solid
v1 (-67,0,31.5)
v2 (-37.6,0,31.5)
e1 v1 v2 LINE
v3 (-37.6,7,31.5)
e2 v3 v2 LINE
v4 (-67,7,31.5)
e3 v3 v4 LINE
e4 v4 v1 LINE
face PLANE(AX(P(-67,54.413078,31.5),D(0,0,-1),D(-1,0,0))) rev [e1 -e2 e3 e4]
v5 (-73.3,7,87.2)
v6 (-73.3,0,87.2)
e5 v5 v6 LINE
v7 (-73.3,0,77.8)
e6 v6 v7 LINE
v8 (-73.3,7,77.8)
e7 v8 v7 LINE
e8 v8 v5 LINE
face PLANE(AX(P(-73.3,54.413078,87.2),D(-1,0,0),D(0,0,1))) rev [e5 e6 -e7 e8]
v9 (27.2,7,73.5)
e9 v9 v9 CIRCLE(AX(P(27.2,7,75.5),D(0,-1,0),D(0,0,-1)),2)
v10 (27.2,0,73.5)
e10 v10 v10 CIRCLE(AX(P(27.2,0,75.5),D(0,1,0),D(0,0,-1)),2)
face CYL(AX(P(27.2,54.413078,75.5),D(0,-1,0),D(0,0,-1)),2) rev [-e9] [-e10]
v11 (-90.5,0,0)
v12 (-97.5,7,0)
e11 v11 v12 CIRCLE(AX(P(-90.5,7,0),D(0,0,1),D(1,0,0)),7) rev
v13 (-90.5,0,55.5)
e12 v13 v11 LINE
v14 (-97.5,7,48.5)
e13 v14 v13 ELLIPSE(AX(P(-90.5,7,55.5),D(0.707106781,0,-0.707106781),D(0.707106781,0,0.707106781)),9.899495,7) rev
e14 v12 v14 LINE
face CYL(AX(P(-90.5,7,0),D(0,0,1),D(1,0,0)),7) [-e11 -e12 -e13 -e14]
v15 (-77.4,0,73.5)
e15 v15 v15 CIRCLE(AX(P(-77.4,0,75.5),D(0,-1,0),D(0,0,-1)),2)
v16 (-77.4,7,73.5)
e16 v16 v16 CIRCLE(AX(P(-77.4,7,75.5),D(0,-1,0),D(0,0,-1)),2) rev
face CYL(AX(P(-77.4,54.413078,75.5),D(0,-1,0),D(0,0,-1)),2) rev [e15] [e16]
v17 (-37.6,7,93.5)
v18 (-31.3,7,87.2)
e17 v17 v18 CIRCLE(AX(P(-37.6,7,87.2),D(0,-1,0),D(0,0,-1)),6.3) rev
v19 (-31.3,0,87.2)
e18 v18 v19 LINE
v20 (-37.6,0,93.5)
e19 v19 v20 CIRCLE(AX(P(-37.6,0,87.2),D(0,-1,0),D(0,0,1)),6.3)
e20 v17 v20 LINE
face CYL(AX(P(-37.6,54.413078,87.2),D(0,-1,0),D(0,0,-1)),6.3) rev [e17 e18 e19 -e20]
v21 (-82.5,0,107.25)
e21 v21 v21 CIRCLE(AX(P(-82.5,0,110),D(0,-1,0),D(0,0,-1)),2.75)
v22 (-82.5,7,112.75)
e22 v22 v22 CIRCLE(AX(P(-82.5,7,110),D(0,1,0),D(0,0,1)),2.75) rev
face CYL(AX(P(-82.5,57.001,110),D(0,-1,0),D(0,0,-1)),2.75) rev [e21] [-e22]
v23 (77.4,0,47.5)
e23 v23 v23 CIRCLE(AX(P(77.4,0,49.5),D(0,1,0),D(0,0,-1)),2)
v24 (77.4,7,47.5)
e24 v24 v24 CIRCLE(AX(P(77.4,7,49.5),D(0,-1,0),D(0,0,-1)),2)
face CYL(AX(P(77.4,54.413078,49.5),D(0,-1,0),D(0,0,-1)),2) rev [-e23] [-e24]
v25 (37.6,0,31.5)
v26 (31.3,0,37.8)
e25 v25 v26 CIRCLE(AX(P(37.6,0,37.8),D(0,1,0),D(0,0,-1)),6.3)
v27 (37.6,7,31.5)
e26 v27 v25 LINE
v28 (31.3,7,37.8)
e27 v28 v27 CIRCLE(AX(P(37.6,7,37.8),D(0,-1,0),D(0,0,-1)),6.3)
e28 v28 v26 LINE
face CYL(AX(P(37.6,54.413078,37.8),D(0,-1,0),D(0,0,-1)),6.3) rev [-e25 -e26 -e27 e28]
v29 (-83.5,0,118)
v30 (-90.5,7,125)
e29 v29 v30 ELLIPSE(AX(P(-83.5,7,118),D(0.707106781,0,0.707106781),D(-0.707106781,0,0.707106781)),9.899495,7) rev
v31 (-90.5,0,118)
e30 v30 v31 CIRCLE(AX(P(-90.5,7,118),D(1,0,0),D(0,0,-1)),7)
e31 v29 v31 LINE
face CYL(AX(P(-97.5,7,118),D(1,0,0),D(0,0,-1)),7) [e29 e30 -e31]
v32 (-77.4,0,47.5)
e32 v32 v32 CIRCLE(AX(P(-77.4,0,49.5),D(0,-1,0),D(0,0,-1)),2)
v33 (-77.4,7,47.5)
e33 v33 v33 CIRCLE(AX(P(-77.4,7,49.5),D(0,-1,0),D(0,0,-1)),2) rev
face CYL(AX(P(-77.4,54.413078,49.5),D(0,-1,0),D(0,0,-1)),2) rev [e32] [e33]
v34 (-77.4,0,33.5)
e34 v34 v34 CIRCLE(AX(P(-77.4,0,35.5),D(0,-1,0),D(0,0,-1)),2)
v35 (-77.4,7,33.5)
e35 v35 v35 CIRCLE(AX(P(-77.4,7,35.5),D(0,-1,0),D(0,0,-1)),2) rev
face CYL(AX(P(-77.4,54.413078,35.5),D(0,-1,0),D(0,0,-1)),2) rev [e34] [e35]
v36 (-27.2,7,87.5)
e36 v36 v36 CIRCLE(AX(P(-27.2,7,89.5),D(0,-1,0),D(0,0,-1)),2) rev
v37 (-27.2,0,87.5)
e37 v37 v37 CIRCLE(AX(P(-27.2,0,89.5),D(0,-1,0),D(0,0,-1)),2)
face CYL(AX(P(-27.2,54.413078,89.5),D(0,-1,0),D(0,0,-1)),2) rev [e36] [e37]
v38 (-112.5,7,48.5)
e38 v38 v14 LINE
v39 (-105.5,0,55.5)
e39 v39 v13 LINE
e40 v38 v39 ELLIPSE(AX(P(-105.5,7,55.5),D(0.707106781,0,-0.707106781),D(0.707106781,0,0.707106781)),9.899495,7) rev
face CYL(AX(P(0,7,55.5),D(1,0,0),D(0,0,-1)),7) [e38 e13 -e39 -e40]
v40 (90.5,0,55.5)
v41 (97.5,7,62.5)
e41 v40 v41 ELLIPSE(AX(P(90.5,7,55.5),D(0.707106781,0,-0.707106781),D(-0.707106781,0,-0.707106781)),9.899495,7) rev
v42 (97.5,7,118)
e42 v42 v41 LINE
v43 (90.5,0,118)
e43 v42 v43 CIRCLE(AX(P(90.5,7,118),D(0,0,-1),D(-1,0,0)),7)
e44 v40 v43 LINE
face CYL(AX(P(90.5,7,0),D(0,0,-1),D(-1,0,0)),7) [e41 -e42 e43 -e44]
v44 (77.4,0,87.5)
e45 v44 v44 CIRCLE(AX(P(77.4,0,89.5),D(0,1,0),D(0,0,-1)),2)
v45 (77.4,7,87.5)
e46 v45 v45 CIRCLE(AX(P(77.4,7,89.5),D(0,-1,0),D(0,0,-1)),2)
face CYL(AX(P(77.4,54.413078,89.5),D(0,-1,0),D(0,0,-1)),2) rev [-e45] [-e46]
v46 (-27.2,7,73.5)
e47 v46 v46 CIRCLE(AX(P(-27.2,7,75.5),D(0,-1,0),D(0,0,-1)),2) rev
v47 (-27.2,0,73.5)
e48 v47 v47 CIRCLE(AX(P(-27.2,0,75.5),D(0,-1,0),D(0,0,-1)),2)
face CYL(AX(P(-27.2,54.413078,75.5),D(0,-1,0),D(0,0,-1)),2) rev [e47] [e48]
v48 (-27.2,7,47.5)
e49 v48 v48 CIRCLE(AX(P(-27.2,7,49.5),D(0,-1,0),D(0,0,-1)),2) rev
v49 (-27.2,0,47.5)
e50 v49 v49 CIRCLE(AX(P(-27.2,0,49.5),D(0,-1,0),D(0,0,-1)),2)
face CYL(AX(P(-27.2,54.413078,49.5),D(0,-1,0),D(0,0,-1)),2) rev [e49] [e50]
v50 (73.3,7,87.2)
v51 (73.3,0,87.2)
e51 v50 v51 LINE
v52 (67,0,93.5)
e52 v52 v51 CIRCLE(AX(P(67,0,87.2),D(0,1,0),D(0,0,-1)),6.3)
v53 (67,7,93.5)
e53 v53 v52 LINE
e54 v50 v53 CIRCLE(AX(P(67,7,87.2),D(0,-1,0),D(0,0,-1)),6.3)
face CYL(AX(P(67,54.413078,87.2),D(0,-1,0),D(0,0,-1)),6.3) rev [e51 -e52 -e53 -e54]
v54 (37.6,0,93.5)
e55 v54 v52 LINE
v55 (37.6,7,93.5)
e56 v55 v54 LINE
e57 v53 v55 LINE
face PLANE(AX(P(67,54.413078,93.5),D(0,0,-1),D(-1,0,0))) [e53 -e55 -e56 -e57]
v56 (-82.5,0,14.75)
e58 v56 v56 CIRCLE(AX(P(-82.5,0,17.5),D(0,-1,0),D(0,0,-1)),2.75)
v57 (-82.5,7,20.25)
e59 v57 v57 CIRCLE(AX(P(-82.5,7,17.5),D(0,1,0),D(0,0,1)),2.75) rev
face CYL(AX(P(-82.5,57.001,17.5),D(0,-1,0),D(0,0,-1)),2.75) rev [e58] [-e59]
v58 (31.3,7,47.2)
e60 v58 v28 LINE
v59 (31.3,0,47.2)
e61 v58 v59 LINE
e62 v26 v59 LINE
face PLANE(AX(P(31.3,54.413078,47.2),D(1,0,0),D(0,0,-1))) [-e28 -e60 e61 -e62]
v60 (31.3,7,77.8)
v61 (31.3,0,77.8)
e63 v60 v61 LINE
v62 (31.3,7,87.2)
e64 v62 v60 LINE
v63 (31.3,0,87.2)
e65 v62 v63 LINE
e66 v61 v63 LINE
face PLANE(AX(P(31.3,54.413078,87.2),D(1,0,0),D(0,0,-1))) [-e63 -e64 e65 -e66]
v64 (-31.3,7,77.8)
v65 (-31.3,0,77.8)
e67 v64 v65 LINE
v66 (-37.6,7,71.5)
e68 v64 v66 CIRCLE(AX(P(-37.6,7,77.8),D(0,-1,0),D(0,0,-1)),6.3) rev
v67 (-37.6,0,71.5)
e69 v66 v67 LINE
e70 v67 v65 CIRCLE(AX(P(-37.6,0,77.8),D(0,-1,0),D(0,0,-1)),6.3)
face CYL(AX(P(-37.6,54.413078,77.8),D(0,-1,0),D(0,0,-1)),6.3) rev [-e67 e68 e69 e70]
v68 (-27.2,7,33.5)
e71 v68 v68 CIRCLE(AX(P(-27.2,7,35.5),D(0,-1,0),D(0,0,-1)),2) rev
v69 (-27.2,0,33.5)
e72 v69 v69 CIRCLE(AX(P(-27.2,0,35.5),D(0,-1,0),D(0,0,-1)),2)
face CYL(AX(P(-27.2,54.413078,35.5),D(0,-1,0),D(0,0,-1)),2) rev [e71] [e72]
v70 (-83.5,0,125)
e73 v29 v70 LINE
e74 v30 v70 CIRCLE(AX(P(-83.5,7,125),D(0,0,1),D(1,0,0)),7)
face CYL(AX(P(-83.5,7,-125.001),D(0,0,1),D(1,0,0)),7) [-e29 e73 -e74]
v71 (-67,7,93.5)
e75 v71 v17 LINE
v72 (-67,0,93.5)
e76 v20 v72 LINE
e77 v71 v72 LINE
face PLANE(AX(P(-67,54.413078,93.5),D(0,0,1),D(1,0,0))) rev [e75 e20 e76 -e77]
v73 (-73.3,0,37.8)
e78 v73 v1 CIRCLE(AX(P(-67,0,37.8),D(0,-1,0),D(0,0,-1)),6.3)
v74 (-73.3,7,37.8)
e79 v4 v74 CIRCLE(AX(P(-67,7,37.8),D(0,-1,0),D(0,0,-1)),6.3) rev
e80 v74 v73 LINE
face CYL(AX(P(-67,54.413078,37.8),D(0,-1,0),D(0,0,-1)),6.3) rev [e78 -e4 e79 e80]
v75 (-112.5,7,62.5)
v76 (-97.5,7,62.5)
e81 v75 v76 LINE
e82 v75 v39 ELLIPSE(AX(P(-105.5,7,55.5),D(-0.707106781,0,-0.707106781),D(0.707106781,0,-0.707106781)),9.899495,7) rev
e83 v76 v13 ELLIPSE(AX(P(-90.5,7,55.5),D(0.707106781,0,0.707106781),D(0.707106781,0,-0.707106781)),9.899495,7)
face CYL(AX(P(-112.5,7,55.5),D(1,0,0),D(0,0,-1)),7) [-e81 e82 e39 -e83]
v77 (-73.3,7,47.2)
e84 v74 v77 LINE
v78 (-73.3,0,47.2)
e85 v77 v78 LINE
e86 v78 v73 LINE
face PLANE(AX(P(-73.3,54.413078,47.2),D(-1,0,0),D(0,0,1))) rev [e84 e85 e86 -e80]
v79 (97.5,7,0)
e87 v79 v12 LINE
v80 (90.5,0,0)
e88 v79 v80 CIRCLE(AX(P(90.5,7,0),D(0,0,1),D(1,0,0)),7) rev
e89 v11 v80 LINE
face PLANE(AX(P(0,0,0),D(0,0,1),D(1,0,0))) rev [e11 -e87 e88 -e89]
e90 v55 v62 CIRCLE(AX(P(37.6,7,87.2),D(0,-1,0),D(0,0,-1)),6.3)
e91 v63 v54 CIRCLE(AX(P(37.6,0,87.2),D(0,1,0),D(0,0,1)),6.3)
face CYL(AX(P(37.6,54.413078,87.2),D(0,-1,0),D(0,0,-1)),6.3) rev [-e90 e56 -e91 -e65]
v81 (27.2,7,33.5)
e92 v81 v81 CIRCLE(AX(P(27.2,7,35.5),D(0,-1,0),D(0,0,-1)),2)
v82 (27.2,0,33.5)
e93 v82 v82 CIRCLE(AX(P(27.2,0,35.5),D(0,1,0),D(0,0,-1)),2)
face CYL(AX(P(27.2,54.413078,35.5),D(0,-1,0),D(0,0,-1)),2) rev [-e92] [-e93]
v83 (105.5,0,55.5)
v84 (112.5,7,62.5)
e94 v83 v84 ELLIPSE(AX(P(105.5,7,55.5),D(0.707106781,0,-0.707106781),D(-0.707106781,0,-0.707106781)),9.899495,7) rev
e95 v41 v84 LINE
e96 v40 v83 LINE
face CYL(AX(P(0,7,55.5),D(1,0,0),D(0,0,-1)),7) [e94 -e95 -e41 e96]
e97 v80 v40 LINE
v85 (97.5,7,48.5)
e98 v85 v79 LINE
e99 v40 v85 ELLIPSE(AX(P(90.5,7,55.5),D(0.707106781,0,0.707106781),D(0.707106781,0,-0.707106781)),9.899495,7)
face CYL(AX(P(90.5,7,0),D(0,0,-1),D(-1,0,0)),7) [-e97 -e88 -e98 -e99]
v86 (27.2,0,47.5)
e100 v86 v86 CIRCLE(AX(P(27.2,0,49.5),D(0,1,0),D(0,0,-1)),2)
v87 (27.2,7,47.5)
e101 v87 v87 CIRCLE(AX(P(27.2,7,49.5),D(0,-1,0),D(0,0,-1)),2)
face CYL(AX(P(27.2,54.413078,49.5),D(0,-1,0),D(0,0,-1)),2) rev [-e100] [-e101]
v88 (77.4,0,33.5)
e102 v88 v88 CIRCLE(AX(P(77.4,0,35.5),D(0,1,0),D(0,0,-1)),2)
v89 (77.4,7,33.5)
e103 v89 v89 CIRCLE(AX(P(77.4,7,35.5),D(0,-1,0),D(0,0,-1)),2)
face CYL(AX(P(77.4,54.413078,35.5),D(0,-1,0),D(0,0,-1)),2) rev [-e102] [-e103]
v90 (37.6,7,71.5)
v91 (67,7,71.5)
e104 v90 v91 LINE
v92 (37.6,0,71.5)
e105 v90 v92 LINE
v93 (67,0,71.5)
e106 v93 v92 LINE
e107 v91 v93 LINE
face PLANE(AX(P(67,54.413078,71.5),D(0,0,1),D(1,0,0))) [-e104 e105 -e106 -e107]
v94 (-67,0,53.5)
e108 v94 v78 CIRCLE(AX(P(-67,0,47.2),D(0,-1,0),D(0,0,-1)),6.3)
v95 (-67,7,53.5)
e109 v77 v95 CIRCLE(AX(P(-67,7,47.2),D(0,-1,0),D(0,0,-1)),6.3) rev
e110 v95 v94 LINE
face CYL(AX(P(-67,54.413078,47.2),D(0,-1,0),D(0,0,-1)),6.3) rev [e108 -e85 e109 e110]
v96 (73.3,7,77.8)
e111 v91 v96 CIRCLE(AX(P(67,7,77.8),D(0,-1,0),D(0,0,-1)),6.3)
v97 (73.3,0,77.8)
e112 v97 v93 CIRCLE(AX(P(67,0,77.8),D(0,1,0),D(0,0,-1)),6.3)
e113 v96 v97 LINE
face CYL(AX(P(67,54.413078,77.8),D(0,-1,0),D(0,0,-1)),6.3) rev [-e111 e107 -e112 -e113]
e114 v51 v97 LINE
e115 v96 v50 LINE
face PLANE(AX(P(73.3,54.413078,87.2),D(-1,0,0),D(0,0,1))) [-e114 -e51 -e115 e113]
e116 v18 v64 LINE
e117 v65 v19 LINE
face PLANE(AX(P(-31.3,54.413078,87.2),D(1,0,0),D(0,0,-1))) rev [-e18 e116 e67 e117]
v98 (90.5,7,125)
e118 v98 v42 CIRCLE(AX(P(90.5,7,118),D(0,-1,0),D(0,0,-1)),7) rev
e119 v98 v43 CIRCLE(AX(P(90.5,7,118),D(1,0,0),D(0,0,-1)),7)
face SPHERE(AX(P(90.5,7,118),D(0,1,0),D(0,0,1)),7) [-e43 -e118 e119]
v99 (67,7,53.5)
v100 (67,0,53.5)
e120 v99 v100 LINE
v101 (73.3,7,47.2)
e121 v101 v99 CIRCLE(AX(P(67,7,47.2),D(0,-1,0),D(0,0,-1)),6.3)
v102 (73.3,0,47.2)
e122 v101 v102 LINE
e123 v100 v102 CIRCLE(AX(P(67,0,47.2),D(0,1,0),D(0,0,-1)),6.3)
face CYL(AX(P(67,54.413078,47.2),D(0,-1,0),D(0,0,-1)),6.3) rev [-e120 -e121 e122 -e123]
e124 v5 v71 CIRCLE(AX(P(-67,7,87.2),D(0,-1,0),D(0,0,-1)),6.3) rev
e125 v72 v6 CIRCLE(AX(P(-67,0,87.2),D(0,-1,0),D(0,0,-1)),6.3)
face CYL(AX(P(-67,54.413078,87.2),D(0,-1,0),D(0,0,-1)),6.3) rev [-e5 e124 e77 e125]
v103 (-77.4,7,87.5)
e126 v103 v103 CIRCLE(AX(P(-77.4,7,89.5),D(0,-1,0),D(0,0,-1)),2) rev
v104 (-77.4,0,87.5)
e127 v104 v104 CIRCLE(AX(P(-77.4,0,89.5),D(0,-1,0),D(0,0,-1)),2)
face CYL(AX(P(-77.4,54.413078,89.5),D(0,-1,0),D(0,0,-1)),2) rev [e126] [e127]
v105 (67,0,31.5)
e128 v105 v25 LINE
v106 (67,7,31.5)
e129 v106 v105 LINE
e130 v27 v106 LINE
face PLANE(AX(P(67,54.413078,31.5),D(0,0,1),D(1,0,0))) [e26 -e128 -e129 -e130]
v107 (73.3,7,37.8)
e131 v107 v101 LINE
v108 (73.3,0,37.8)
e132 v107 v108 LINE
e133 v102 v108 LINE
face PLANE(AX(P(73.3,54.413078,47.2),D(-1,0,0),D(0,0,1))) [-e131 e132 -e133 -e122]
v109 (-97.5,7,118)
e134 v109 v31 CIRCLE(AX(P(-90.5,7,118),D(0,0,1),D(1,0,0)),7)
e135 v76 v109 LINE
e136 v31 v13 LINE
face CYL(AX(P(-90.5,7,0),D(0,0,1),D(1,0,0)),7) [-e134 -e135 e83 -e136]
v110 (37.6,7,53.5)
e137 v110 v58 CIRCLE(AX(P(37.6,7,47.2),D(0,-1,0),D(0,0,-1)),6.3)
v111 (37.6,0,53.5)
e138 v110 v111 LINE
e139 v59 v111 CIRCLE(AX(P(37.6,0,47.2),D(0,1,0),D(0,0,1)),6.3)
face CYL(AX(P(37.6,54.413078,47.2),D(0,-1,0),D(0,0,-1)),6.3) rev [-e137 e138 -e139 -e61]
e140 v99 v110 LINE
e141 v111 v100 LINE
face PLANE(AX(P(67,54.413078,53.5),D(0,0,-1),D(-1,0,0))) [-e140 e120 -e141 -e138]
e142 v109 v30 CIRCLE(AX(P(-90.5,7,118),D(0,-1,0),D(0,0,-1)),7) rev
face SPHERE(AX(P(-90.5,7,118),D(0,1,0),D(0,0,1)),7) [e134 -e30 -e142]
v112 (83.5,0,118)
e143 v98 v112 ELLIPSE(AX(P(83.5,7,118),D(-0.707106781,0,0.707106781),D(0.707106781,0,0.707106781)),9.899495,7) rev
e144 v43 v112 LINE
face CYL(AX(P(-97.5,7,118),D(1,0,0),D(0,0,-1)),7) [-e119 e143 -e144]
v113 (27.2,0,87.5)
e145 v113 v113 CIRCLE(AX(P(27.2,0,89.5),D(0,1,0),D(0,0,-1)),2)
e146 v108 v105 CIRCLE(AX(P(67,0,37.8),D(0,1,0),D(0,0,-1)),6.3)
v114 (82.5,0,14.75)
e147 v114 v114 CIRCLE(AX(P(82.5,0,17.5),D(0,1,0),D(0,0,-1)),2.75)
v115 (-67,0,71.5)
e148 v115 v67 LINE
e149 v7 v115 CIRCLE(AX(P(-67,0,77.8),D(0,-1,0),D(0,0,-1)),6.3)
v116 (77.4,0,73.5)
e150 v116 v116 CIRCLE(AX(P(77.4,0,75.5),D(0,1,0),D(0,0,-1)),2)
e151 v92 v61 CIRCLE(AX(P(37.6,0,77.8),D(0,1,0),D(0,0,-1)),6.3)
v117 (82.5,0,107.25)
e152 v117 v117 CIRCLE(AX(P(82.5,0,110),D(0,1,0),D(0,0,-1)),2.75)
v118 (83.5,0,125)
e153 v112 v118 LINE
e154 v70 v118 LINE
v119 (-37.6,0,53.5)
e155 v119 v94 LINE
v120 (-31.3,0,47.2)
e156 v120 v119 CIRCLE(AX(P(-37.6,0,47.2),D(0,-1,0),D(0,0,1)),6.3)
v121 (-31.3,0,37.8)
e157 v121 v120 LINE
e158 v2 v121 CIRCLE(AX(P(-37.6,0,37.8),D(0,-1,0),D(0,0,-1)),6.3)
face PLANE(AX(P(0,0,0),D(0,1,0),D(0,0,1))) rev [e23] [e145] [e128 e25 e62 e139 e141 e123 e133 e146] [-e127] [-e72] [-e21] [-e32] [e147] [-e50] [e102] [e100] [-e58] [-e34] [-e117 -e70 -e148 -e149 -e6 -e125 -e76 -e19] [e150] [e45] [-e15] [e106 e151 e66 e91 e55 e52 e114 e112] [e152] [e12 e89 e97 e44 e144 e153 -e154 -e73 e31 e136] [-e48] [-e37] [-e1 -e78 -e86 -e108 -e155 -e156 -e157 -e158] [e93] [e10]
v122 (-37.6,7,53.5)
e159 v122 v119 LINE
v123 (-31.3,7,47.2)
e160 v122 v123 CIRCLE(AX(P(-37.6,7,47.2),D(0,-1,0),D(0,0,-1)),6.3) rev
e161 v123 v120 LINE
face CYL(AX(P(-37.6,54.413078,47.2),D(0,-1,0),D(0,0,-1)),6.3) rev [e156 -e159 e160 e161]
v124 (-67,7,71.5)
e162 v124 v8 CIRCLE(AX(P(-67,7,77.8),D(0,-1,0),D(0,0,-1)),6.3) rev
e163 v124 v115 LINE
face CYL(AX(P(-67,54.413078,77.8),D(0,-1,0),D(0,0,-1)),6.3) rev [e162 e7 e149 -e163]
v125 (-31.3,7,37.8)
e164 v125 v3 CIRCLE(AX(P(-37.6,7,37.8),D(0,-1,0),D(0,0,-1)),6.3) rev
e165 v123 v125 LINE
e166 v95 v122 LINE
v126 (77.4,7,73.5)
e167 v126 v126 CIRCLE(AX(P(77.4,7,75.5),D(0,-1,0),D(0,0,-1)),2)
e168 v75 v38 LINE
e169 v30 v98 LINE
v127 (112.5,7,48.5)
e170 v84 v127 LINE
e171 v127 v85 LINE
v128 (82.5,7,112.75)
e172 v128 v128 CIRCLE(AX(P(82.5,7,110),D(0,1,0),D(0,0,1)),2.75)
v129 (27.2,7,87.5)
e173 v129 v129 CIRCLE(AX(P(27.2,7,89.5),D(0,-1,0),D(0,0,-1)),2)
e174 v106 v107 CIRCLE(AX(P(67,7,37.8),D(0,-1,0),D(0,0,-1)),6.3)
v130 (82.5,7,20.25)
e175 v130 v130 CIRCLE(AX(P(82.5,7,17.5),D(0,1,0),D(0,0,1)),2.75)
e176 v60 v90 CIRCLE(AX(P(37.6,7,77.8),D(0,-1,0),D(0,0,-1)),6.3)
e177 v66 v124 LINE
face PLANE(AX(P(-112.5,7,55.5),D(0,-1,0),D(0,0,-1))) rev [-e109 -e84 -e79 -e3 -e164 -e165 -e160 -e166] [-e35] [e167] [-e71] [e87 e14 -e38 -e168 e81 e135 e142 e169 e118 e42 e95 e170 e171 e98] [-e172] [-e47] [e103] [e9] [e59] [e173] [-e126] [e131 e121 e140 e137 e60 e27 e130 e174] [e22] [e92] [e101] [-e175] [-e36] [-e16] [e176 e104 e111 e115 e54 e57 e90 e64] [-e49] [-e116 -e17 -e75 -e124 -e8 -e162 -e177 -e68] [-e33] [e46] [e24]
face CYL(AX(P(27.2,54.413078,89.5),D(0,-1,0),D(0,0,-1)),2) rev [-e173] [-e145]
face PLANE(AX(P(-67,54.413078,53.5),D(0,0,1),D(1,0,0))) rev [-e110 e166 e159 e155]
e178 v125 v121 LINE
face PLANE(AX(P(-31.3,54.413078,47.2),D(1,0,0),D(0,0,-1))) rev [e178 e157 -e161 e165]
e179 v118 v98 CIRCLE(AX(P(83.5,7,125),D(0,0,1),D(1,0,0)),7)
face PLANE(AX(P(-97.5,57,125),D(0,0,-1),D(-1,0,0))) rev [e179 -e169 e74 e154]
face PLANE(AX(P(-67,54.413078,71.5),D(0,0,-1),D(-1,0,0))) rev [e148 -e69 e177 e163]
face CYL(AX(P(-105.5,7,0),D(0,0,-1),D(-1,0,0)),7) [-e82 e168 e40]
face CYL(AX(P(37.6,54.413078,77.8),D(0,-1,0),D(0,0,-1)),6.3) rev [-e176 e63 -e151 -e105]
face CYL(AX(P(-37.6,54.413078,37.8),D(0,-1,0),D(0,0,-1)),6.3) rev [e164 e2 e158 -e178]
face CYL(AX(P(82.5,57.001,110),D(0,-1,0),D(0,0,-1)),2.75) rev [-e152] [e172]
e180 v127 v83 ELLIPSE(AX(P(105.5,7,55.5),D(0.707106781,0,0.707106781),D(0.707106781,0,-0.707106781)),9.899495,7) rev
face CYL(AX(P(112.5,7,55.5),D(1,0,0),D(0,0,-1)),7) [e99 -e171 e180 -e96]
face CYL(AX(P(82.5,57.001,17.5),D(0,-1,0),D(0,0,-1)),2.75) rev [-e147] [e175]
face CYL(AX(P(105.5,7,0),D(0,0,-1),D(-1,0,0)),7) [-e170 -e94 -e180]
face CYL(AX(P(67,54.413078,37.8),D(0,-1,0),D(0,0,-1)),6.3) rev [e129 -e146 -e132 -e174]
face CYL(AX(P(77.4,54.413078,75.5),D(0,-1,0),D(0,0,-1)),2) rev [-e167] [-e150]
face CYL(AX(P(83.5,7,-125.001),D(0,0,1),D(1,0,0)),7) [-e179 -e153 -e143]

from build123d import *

# Parameters (mm, degrees)
SKETCH2_W               = 195
SKETCH2_H               = 125
BOSS_EXTRUDE1_DEPTH     = 57
SKETCH3_W               = 181
SKETCH3_H               = 118
CUT_EXTRUDE1_DEPTH      = 50
BOSS_EXTRUDE2_DEPTH     = 15
CUT_EXTRUDE4_REACH      = 179.568
SKETCH7_R               = 2.75
SKETCH34_R              = 2
SKETCH34_W              = 22
SKETCH34_H              = 42
CUT_EXTRUDE8_DEPTH      = 7
MIRROR2_COPY_1_DEPTH    = 15
MIRROR2_COPY_2_REACH    = 179.568
MIRROR2_COPY_2_SKETCH_R = 2.75
MIRROR2_COPY_3_SKETCH_R = 2
MIRROR2_COPY_3_SKETCH_W = 22
MIRROR2_COPY_3_SKETCH_H = 42
MIRROR2_COPY_3_DEPTH    = 7
FILLET2_R               = 7
FILLET7_R               = 7
BOSS_EXTRUDE8_REACH     = 282.009
BOSS_EXTRUDE9_REACH     = 282.009
SKETCH29_W              = 460.325022979
SKETCH29_H              = 444.411594697
CUT_EXTRUDE5_DEPTH      = 50
SKETCH30_R              = 48
BOSS_EXTRUDE10_DEPTH    = 11
SKETCH31_R              = 41
CUT_EXTRUDE6_DEPTH      = 11
SKETCH32_R              = 3.2
CUT_EXTRUDE7_DEPTH      = 7
FILLET8_R               = 7
FILLET11_R              = 6.3
SKETCH37_W              = 42
SKETCH37_H              = 75
BOSS_EXTRUDE11_DEPTH    = 7
SKETCH39_W              = 254.771763885
SKETCH39_H              = 96.813270276
CUT_EXTRUDE9_DEPTH      = 125
SKETCH40_W              = 43.421970192
SKETCH40_H              = 69.563768573
BOSS_EXTRUDE12_DEPTH    = 7
SKETCH41_R              = 2
CUT_EXTRUDE10_DEPTH     = 7


with BuildPart() as part:
    # Sketch2 → Boss-Extrude1 (new body)
    with BuildSketch(Plane(origin=(0, 0, 0), x_dir=(1, 0, 0), z_dir=(0, 1, 0))):
        with Locations((0, -62.5)):
            Rectangle(SKETCH2_W, SKETCH2_H)
    boss_extrude1 = extrude(amount=BOSS_EXTRUDE1_DEPTH)

    # Sketch3 → Cut-Extrude1 (cut)
    with BuildSketch(Plane(origin=(0, 57, 0), x_dir=(1, 0, 0), z_dir=(0, 1, 0))):
        with Locations((0, -59)):
            Rectangle(SKETCH3_W, SKETCH3_H)
    cut_extrude1 = extrude(amount=-CUT_EXTRUDE1_DEPTH, mode=Mode.SUBTRACT)

    # Sketch5 → Boss-Extrude2 (add)
    with BuildSketch(Plane.ZY.offset(97.5)):
        Polygon((48.5, 7), (48.5, 0), (62.5, 0), (62.5, 57), (55.5, 57), (55.5, 7), align=None)
    boss_extrude2 = extrude(amount=BOSS_EXTRUDE2_DEPTH)

    # Sketch7 → Cut-Extrude4 (cut, up to next)
    with BuildSketch(Plane.XZ, mode=Mode.PRIVATE) as cut_extrude4_sk1:
        with Locations(Location((-82.5, 17.5, 0), (0, 0, 270))):
            Circle(SKETCH7_R)
    cut_extrude4_tool1 = extrude(cut_extrude4_sk1.sketch, amount=-CUT_EXTRUDE4_REACH, mode=Mode.PRIVATE) & part.part
    # Sketch7 → Cut-Extrude4 (cut, up to next)
    with BuildSketch(Plane.XZ, mode=Mode.PRIVATE) as cut_extrude4_sk2:
        with Locations(Location((-82.5, 110, 0), (0, 0, 270))):
            Circle(SKETCH7_R)
    cut_extrude4_tool2 = extrude(cut_extrude4_sk2.sketch, amount=-CUT_EXTRUDE4_REACH, mode=Mode.PRIVATE) & part.part
    cut_extrude4_1 = cut_extrude4_tool1.solids().sort_by_distance((-82.5, 0, 17.5))[0]
    add(cut_extrude4_1, mode=Mode.SUBTRACT)
    cut_extrude4_2 = cut_extrude4_tool2.solids().sort_by_distance((-82.5, 0, 110))[0]
    add(cut_extrude4_2, mode=Mode.SUBTRACT)
    cut_extrude4 = cut_extrude4_1 + cut_extrude4_2  # Cut-Extrude4 as one shape, for the pattern or mirror that repeats it

    # Sketch34 → Cut-Extrude8 (cut)
    with BuildSketch(Plane.XZ):
        with Locations(Location((-57.3, 88.85, 0), (0, 0, 270))):
            Circle(SKETCH34_R)
        with Locations(Location((-67.3, 88.85, 0), (0, 0, 270))):
            Circle(SKETCH34_R)
        with Locations(Location((-78.45, 63.75, 0), (0, 0, 270))):
            Circle(SKETCH34_R)
        with Locations(Location((-46.15, 63.75, 0), (0, 0, 270))):
            Circle(SKETCH34_R)
        with Locations(Location((-57.3, 38.65, 0), (0, 0, 270))):
            Circle(SKETCH34_R)
        with Locations(Location((-67.3, 38.65, 0), (0, 0, 270))):
            Circle(SKETCH34_R)
        with Locations((-62.3, 63.75)):
            Rectangle(SKETCH34_W, SKETCH34_H)
    cut_extrude8 = extrude(amount=-CUT_EXTRUDE8_DEPTH, mode=Mode.SUBTRACT)

    # Mirror1: Boss-Extrude2, Cut-Extrude4, Cut-Extrude8 across plane
    add(boss_extrude2.mirror(Plane(origin=(0, 0, 0), x_dir=(0, 0, 1), z_dir=(1, 0, 0))))
    add(cut_extrude4.mirror(Plane(origin=(0, 0, 0), x_dir=(0, 0, 1), z_dir=(1, 0, 0))), mode=Mode.SUBTRACT)
    add(cut_extrude8.mirror(Plane(origin=(0, 0, 0), x_dir=(0, 0, 1), z_dir=(1, 0, 0))), mode=Mode.SUBTRACT)

    # Mirror2: Boss-Extrude1, Cut-Extrude1, Boss-Extrude2, Cut-Extrude4, Cut-Extrude8 across plane
    add(boss_extrude1.mirror(Plane.XY))
    add(cut_extrude1.mirror(Plane.XY), mode=Mode.SUBTRACT)
    add(boss_extrude2.mirror(Plane.XY))
    add(cut_extrude4.mirror(Plane.XY), mode=Mode.SUBTRACT)
    add(cut_extrude8.mirror(Plane.XY), mode=Mode.SUBTRACT)

    # Mirror2 copy 1 sketch → Mirror2 copy 1 (add)
    with BuildSketch(Plane(origin=(97.5, 0, 0), x_dir=(0, 0, -1), z_dir=(1, 0, 0))):
        Polygon((48.5, 7), (48.5, 0), (62.5, 0), (62.5, 57), (55.5, 57), (55.5, 7), align=None)
    extrude(amount=MIRROR2_COPY_1_DEPTH)

    # Mirror2 copy 2 sketch → Mirror2 copy 2 (cut, up to next)
    with BuildSketch(Plane(origin=(0, 0, 0), x_dir=(-1, 0, 0), z_dir=(0, -1, 0)), mode=Mode.PRIVATE) as mirror2_copy_2_sk1:
        with Locations(Location((-82.5, 17.5, 0), (0, 0, 270))):
            Circle(MIRROR2_COPY_2_SKETCH_R)
    mirror2_copy_2_tool1 = extrude(mirror2_copy_2_sk1.sketch, amount=-MIRROR2_COPY_2_REACH, mode=Mode.PRIVATE) & part.part
    # Mirror2 copy 2 sketch → Mirror2 copy 2 (cut, up to next)
    with BuildSketch(Plane(origin=(0, 0, 0), x_dir=(-1, 0, 0), z_dir=(0, -1, 0)), mode=Mode.PRIVATE) as mirror2_copy_2_sk2:
        with Locations(Location((-82.5, 110, 0), (0, 0, 270))):
            Circle(MIRROR2_COPY_2_SKETCH_R)
    mirror2_copy_2_tool2 = extrude(mirror2_copy_2_sk2.sketch, amount=-MIRROR2_COPY_2_REACH, mode=Mode.PRIVATE) & part.part
    add(mirror2_copy_2_tool1.solids().sort_by_distance((82.5, 0, -17.5))[0], mode=Mode.SUBTRACT)
    add(mirror2_copy_2_tool2.solids().sort_by_distance((82.5, 0, -110))[0], mode=Mode.SUBTRACT)

    # Mirror2 copy 3 sketch → Mirror2 copy 3 (cut)
    with BuildSketch(Plane(origin=(0, 0, 0), x_dir=(-1, 0, 0), z_dir=(0, -1, 0))):
        with Locations(Location((-57.3, 88.85, 0), (0, 0, 270))):
            Circle(MIRROR2_COPY_3_SKETCH_R)
        with Locations(Location((-67.3, 88.85, 0), (0, 0, 270))):
            Circle(MIRROR2_COPY_3_SKETCH_R)
        with Locations(Location((-78.45, 63.75, 0), (0, 0, 270))):
            Circle(MIRROR2_COPY_3_SKETCH_R)
        with Locations(Location((-46.15, 63.75, 0), (0, 0, 270))):
            Circle(MIRROR2_COPY_3_SKETCH_R)
        with Locations(Location((-57.3, 38.65, 0), (0, 0, 270))):
            Circle(MIRROR2_COPY_3_SKETCH_R)
        with Locations(Location((-67.3, 38.65, 0), (0, 0, 270))):
            Circle(MIRROR2_COPY_3_SKETCH_R)
        with Locations((-62.3, 63.75)):
            Rectangle(MIRROR2_COPY_3_SKETCH_W, MIRROR2_COPY_3_SKETCH_H)
    extrude(amount=-MIRROR2_COPY_3_DEPTH, mode=Mode.SUBTRACT)

    # Fillet2
    fillet2_edges = [part.edges().sort_by_distance(p)[0] for p in [
        (-97.5, 28.5, -125),
        (97.5, 28.5, -125),
        (97.5, 28.5, 125),
        (-97.5, 28.5, 125),
    ]]
    fillet(fillet2_edges, radius=FILLET2_R)

    # Fillet7
    fillet7_edges = [part.edges().sort_by_distance(p)[0] for p in [
        (97.5, 0, 0),
        (-97.5, 0, 0),
        (97.5, 0, -90.25),
        (-97.5, 0, 90.25),
        (97.5, 0, 90.25),
        (-97.5, 0, -90.25),
        (0, 0, -125),
        (0, 0, 125),
        (112.5, 0, 55.5),
        (105, 0, 62.5),
        (105, 0, 48.5),
        (-112.5, 0, -55.5),
        (-105, 0, -62.5),
        (-105, 0, -48.5),
        (105, 0, -48.5),
        (105, 0, -62.5),
        (112.5, 0, -55.5),
        (-105, 0, 48.5),
        (-105, 0, 62.5),
        (-95.449747468, 0, 122.949747468),
        (-95.449747468, 0, -122.949747468),
        (95.449747468, 0, -122.949747468),
        (95.449747468, 0, 122.949747468),
        (-112.5, 0, 55.5),
    ]]
    fillet(fillet7_edges, radius=FILLET7_R - 0.0001)  # a hair under: the kernel refuses the full size

    # Sketch26 → Boss-Extrude8 (add, up to next)
    with BuildSketch(Plane.XY.offset(125), mode=Mode.PRIVATE) as boss_extrude8_sk1:
        with BuildLine():
            Line((-90.5, 7), (90.5, 7))
            ThreePointArc((90.5, 7), (88.449747468, 2.050252532), (83.5, 0))
            Line((83.5, 0), (-83.5, 0))
            ThreePointArc((-83.5, 0), (-88.449747468, 2.050252532), (-90.5, 7))
        make_face()
    boss_extrude8_tool1 = extrude(boss_extrude8_sk1.sketch, amount=-BOSS_EXTRUDE8_REACH, mode=Mode.PRIVATE) - part.part
    add(boss_extrude8_tool1.solids().sort_by_distance((0, 3.532685, 125))[0])

    # Sketch27 → Boss-Extrude9 (add, up to next)
    with BuildSketch(Plane(origin=(0, 0, -125), x_dir=(-1, 0, 0), z_dir=(0, 0, -1)), mode=Mode.PRIVATE) as boss_extrude9_sk1:
        with BuildLine():
            Line((-90.5, 7), (90.5, 7))
            ThreePointArc((90.5, 7), (88.449747468, 2.050252532), (83.5, 0))
            Line((83.5, 0), (-83.5, 0))
            ThreePointArc((-83.5, 0), (-88.449747468, 2.050252532), (-90.5, 7))
        make_face()
    boss_extrude9_tool1 = extrude(boss_extrude9_sk1.sketch, amount=-BOSS_EXTRUDE9_REACH, mode=Mode.PRIVATE) - part.part
    add(boss_extrude9_tool1.solids().sort_by_distance((0, 3.532685, -125))[0])

    # Sketch29 → Cut-Extrude5 (cut)
    with BuildSketch(Plane(origin=(0, 57, 0), x_dir=(1, 0, 0), z_dir=(0, 1, 0))):
        with Locations((1.552529588, 6.210118353)):
            Rectangle(SKETCH29_W, SKETCH29_H)
    extrude(amount=-CUT_EXTRUDE5_DEPTH, mode=Mode.SUBTRACT)

    # Sketch30 → Boss-Extrude10 (add)
    with BuildSketch(Plane(origin=(0, 7, 0), x_dir=(1, 0, 0), z_dir=(0, 1, 0))):
        with Locations(Location((0, 64, 0), (0, 0, 0.616739929))):
            Circle(SKETCH30_R)
    extrude(amount=BOSS_EXTRUDE10_DEPTH)

    # Sketch31 → Cut-Extrude6 (cut)
    with BuildSketch(Plane.XZ):
        with Locations(Location((0, -64, 0), (0, 0, 270))):
            Circle(SKETCH31_R)
    extrude(amount=-CUT_EXTRUDE6_DEPTH, mode=Mode.SUBTRACT)

    # Sketch32 → Cut-Extrude7 (cut)
    with BuildSketch(Plane.XZ.offset(-11)):
        with Locations(Location((0, -30, 0), (0, 0, 270))):
            Circle(SKETCH32_R)
        with Locations(Location((0, -98, 0), (0, 0, 270))):
            Circle(SKETCH32_R)
        with Locations(Location((34, -64, 0), (0, 0, 270))):
            Circle(SKETCH32_R)
        with Locations(Location((-34, -64, 0), (0, 0, 270))):
            Circle(SKETCH32_R)
    extrude(amount=-CUT_EXTRUDE7_DEPTH, mode=Mode.SUBTRACT)

    # Fillet8
    fillet8_edges = [part.edges().sort_by_distance(p)[0] for p in [
        (-47.997219225, 18, -63.483331143),
    ]]
    fillet(fillet8_edges, radius=FILLET8_R)

    # Fillet11
    fillet11_edges = [part.edges().sort_by_distance(p)[0] for p in [
        (73.3, 3.5, 84.75),
        (73.3, 3.5, 42.75),
        (51.3, 3.5, 42.75),
        (51.3, 3.5, 84.75),
        (-51.3, 3.5, 42.75),
        (-51.3, 3.5, 84.75),
        (-73.3, 3.5, 84.75),
        (-73.3, 3.5, 42.75),
    ]]
    fillet(fillet11_edges, radius=FILLET11_R)

    # Sketch37 → Boss-Extrude11 (add)
    with BuildSketch(Plane.XZ):
        with Locations((64.5, -62.5)):
            Rectangle(SKETCH37_W, SKETCH37_H)
        with Locations((-64.5, -62.5)):
            Rectangle(SKETCH37_W, SKETCH37_H)
    extrude(amount=-BOSS_EXTRUDE11_DEPTH)

    # Sketch39 → Cut-Extrude9 (cut)
    with BuildSketch(Plane(origin=(0, 0, -125), x_dir=(-1, 0, 0), z_dir=(0, 0, -1))):
        with Locations((-2.436947306, 5.612660368)):
            Rectangle(SKETCH39_W, SKETCH39_H)
    extrude(amount=-CUT_EXTRUDE9_DEPTH, mode=Mode.SUBTRACT)

    # Sketch40 → Boss-Extrude12 (add)
    with BuildSketch(Plane.XZ):
        with Locations((-61.588304661, 62.943081328)):
            Rectangle(SKETCH40_W, SKETCH40_H)
    boss_extrude12 = extrude(amount=-BOSS_EXTRUDE12_DEPTH)

    # Sketch41 → Cut-Extrude10 (cut)
    with BuildSketch(Plane.XZ):
        with Locations(Location((-27.2, 89.5, 0), (0, 0, 270))):
            Circle(SKETCH41_R)
        with Locations(Location((-27.2, 75.5, 0), (0, 0, 270))):
            Circle(SKETCH41_R)
        with Locations(Location((-77.4, 75.5, 0), (0, 0, 270))):
            Circle(SKETCH41_R)
        with Locations(Location((-77.4, 89.5, 0), (0, 0, 270))):
            Circle(SKETCH41_R)
        with Locations(Location((-27.2, 49.5, 0), (0, 0, 270))):
            Circle(SKETCH41_R)
        with Locations(Location((-27.2, 35.5, 0), (0, 0, 270))):
            Circle(SKETCH41_R)
        with Locations(Location((-77.4, 35.5, 0), (0, 0, 270))):
            Circle(SKETCH41_R)
        with Locations(Location((-77.4, 49.5, 0), (0, 0, 270))):
            Circle(SKETCH41_R)
        with BuildLine():
            Line((-67, 93.5), (-37.6, 93.5))
            ThreePointArc((-37.6, 93.5), (-33.145227279, 91.654772721), (-31.3, 87.2))
            Line((-31.3, 87.2), (-31.3, 77.8))
            ThreePointArc((-31.3, 77.8), (-33.145227279, 73.345227279), (-37.6, 71.5))
            Line((-37.6, 71.5), (-67, 71.5))
            ThreePointArc((-67, 71.5), (-71.454772721, 73.345227279), (-73.3, 77.8))
            Line((-73.3, 77.8), (-73.3, 87.2))
            ThreePointArc((-73.3, 87.2), (-71.454772721, 91.654772721), (-67, 93.5))
        make_face()
        with BuildLine():
            Line((-67, 53.5), (-37.6, 53.5))
            ThreePointArc((-37.6, 53.5), (-33.145227279, 51.654772721), (-31.3, 47.2))
            Line((-31.3, 47.2), (-31.3, 37.8))
            ThreePointArc((-31.3, 37.8), (-33.145227279, 33.345227279), (-37.6, 31.5))
            Line((-37.6, 31.5), (-67, 31.5))
            ThreePointArc((-67, 31.5), (-71.454772721, 33.345227279), (-73.3, 37.8))
            Line((-73.3, 37.8), (-73.3, 47.2))
            ThreePointArc((-73.3, 47.2), (-71.454772721, 51.654772721), (-67, 53.5))
        make_face()
    cut_extrude10 = extrude(amount=-CUT_EXTRUDE10_DEPTH, mode=Mode.SUBTRACT)

    # Mirror3: Boss-Extrude12 across plane
    add(boss_extrude12.mirror(Plane(origin=(0, 0, 0), x_dir=(0, 0, 1), z_dir=(1, 0, 0))))

    # Mirror4: Cut-Extrude10 across plane
    add(cut_extrude10.mirror(Plane(origin=(0, 0, 0), x_dir=(0, 0, 1), z_dir=(1, 0, 0))), mode=Mode.SUBTRACT)


solid = part.part
